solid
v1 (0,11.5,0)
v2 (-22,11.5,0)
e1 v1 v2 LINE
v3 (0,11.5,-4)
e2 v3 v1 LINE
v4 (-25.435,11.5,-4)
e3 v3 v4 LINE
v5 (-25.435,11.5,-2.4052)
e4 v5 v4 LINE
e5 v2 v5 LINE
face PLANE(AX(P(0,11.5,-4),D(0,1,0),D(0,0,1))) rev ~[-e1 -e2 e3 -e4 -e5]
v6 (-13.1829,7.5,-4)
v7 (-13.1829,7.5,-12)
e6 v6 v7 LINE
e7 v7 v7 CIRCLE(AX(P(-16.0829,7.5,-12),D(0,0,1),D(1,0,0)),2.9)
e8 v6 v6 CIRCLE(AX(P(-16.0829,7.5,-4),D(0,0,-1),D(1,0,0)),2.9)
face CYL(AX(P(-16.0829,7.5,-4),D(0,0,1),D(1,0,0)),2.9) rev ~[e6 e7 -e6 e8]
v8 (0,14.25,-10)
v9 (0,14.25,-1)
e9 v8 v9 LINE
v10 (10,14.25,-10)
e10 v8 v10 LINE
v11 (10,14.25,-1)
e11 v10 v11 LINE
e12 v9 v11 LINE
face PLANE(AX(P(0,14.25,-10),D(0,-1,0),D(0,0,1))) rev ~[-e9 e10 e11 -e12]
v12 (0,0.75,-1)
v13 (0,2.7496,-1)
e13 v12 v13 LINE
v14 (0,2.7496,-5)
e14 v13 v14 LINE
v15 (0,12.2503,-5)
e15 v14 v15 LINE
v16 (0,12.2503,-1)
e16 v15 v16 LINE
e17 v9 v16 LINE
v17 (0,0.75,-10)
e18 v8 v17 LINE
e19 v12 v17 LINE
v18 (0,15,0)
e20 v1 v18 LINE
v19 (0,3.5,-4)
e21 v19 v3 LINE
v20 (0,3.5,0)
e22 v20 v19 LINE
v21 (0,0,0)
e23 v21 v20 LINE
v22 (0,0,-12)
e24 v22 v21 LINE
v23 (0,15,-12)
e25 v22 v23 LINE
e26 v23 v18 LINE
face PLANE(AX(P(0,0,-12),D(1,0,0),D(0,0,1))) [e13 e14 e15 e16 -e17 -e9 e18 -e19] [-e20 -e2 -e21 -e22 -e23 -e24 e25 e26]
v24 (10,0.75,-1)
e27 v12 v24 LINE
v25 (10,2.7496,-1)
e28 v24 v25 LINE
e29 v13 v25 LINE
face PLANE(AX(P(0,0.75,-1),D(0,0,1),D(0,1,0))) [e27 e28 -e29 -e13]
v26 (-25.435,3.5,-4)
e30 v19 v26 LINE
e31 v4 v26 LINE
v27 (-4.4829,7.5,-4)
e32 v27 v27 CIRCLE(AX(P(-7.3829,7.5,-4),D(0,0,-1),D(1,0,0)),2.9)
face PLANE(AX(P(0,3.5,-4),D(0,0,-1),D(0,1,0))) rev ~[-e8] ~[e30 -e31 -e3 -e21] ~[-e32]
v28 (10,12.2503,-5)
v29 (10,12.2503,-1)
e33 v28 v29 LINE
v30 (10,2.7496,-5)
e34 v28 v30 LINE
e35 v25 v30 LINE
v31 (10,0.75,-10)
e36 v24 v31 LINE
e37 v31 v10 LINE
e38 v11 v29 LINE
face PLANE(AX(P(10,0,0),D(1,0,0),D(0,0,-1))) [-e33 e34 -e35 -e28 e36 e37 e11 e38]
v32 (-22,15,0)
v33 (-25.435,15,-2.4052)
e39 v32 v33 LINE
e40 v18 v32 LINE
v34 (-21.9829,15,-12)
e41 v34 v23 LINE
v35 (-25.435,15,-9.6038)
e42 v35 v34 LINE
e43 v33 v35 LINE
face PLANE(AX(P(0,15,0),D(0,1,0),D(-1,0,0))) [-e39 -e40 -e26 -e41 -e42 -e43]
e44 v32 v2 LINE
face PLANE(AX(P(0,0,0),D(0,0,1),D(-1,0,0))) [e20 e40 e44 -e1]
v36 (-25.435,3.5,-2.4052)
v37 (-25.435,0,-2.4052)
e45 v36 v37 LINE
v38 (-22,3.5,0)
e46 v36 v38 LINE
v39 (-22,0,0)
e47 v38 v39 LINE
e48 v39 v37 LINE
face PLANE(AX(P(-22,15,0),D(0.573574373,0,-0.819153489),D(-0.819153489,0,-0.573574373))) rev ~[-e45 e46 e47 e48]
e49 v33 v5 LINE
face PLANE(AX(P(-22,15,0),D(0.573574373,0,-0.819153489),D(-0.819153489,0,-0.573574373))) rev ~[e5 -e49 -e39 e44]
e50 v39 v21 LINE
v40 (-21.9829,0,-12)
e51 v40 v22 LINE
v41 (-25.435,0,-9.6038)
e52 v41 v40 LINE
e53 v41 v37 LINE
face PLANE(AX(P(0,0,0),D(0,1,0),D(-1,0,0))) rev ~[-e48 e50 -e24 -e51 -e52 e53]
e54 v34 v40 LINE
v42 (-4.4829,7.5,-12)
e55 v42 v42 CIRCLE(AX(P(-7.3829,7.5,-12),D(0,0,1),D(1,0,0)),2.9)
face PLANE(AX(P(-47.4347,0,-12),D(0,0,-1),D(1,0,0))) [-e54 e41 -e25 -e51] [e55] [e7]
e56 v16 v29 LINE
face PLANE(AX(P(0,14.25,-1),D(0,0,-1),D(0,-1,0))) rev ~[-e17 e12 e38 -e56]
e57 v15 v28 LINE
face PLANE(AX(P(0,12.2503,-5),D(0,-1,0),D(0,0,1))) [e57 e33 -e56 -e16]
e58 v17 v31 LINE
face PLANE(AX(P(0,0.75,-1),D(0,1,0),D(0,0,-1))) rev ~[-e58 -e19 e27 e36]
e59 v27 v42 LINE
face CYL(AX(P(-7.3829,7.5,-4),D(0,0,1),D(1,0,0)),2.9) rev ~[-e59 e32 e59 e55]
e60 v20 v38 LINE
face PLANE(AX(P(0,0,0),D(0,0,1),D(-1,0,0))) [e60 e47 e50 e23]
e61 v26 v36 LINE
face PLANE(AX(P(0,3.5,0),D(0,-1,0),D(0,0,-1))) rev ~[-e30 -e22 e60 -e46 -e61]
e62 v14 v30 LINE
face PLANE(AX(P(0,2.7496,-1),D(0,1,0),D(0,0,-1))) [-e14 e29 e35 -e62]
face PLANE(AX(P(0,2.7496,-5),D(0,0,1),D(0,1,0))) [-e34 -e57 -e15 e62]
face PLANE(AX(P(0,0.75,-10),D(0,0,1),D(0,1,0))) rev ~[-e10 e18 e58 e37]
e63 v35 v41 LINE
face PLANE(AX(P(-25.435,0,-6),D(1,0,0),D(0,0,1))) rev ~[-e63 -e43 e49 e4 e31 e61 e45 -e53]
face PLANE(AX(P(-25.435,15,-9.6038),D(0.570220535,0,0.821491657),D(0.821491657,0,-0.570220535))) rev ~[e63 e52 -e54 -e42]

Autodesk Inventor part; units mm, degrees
ref_plane "YZ Plane" through (0, 0, 0) normal (1, 0, 0) x (0, 1, 0)
ref_plane "XZ Plane" through (0, 0, 0) normal (0, 1, 0) x (-1, 0, 0)
ref_plane "XY Plane" through (0, 0, 0) normal (0, 0, 1) x (1, 0, 0)
sketch "Náčrt1" plane through (0, 0, 0) normal (0, 1, 0) x (-1, 0, 0)
  line L0 (0, 0) -> (50, 0)
  line L1 (50, 0) -> (66.0697, -19.1511)
  line L2 (50, 0) -> (75, 0) construction
  line L3 (66.0697, -19.1511) -> (58.4092, -25.579)
  line L4 (0, -12) -> (0, 0)
  line L5 (58.6554, -25.3724) -> (47.4347, -12)
  line L6 (47.4347, -12) -> (0, -12)
  dimension "d0" = 50
  dimension "d2" = 25
  dimension "d3" = 50
  dimension "d4" = 10
  dimension "d5" = 12
extrude "Vysunutí1" add sketch "Náčrt1" along normal blind 15
sketch "Náčrt11" plane through (0, 0, 0) normal (1, 0, 0) x (0, 0, -1)
  line L0 (0, 0) -> (0, 15) projected
  line L1 (0, 7.5) -> (12, 7.5)
  line L2 (12, 0) -> (12, 15) projected
  line L3 (0, 3.5) -> (4, 3.5)
  line L4 (4, 3.5) -> (4, 11.5)
  line L5 (4, 11.5) -> (0, 11.5)
  line L6 (0, 11.5) -> (0, 3.5)
  point P0 (0, 7.5)
  point P1 (0, 11.5)
  dimension "d64" = 4
  dimension "d65" = 8
extrude "Vysunutí10" cut sketch "Náčrt11" against normal through all
sketch "Náčrt21" plane through (-66.0697, 0, -19.1511) normal (-0.6427876, 0, -0.7660444) x (-0.7660444, 0, 0.6427876)
  line L0 (0, 0) -> (0, 15) projected
  line L1 (0, 3.5) -> (-4, 3.5)
  line L2 (-4, 3.5) -> (-4, 11.5)
  line L3 (-4, 11.5) -> (0, 11.5)
  line L4 (0, 11.5) -> (0, 3.5)
  point P0 (-38.3022, 0)
  point P1 (0, 7.5)
  point P2 (0, 11.5)
  dimension "d68" = 4
  dimension "d69" = 8
extrude "Vysunutí11" cut sketch "Náčrt21" against normal through all
sketch "Náčrt30" plane through (0, 0, -12) normal (0, 0, -1) x (-1, 0, 0)
  point P0 (0, 0)
sketch "Náčrt31" plane through (0, 0, 0) normal (1, 0, 0) x (0, 0, -1)
  point P0 (0, 0)
sketch "Náčrt32" plane through (0, 0, 0) normal (0, -1, 0) x (1, 0, 0)
  line L0 (-47.4347, -12) -> (-58.6554, -25.3724) projected
  line L1 (-47.4347, -12) -> (-47.4347, 0)
  line L2 (-47.4347, -12) -> (-58.6554, -25.3724)
  line L3 (-58.6554, -25.3724) -> (-66.0697, -19.1511) projected
  line L4 (-66.0697, -19.1511) -> (-50, 0)
  line L5 (-50, 0) -> (-47.4347, 0)
  line L6 (-50, 0) -> (0, 0) projected
  point P0 (-47.4347, 0)
extrude "Vysunutí16" add sketch "Náčrt32" against normal through all
sketch "Náčrt33" plane through (0, 0, 0) normal (0, -1, 0) x (1, 0, 0)
  line L0 (-47.4347, -12) -> (-58.6554, -25.3724) projected
  line L1 (-47.4347, -4) -> (-47.4347, 0) projected
  line L2 (-47.4347, -12) -> (-47.4347, 0)
  line L3 (-66.0697, -19.1511) -> (-50, 0) projected
  line L4 (-47.4347, 0) -> (-50, 0)
  line L5 (-50, 0) -> (-66.0697, -19.1511)
  line L6 (-50, 0) -> (0, 0) projected
  line L7 (-66.0697, -19.1511) -> (-50, 0) projected
  line L8 (-58.6554, -25.3724) -> (-66.0697, -19.1511) projected
  line L9 (-47.4347, -12) -> (-58.6554, -25.3724) projected
  line L10 (0, -12) -> (-47.4347, -12) projected
  line L11 (0, 0) -> (0, -12) projected
  line L12 (-58.6554, -25.3724) -> (-66.0697, -19.1511) projected
  line L13 (-66.0697, -19.1511) -> (-58.6554, -25.3724)
  line L14 (-58.6554, -25.3724) -> (-47.4347, -12)
extrude "Vysunutí17" cut sketch "Náčrt33" against normal through all contours L0 L8 L3 L4 L1 L2
sketch "Náčrt34" plane through (0, 0, 0) normal (0, -1, 0) x (1, 0, 0)
  line L0 (-47.4347, 0) -> (-47.4347, -12) projected
  line L1 (-47.4347, 0) -> (-47.4347, -12) projected
  line L2 (0, -12) -> (-47.4347, -12) projected
  line L3 (0, 0) -> (0, -12) projected
  line L4 (-47.4347, 0) -> (0, 0) projected
  line L5 (0, -12) -> (-47.4347, -12) projected
  line L6 (-44, -12) -> (-47.4347, -9.595)
  line L7 (-44, -12) -> (-39.807, -12) construction
  line L8 (-47.4347, -9.595) -> (-47.4347, -12)
  line L9 (-44, -12) -> (-47.4347, -12)
  line L10 (0, 0) -> (-47.4347, 0) projected
  line L11 (-44, 0) -> (-47.0563, -2.14)
  line L12 (-44, 0) -> (-40.269, 0) construction
  line L13 (-47.0563, -2.14) -> (-47.4347, -2.405)
  line L14 (-47.4347, -2.405) -> (-47.4347, 0)
  line L15 (-44, 0) -> (-47.4347, 0)
  dimension "d99" = 145
  dimension "d100" = 145
extrude "Vysunutí18" cut sketch "Náčrt34" against normal through all contours L4 L11 L13 L0 | L6 L2 L0
sketch "Náčrt39" plane through (0, 0, 0) normal (1, 0, 0) x (0, 0, -1)
  line L0 (0, 11.5) -> (0, 15) projected
  line L1 (12, 0) -> (12, 15) projected
  line L2 (0, 0) -> (0, 3.5) projected
  line L3 (1, 0.75) -> (10, 0.75)
  line L4 (10, 14.25) -> (1, 14.25)
  line L5 (1, 14.25) -> (1, 12.2503)
  line L6 (4, 4.7) -> (4, 10.3) projected
  line L7 (5, 12.2503) -> (1, 12.2503)
  line L8 (1, 0.75) -> (1, 2.7496)
  line L9 (1, 2.7496) -> (5, 2.7496)
  line L10 (5, 2.7496) -> (5, 12.2503)
  line L11 (10, 0.75) -> (10, 14.25)
  line L12 (4, 7.5) -> (12, 7.5)
  line L13 (12, 9.95) -> (12, 5.05) projected
  point P0 (1, 1.7498)
  point P1 (5, 7.5)
  point P2 (1, 13.2502)
  point P3 (10, 7.5)
  point P4 (5.5, 0.75)
  dimension "d119" = 13.5
extrude "Vysunutí22" add sketch "Náčrt39" along normal blind 10
sketch "Náčrt40" plane through (0, 0, 0) normal (0, -1, 0) x (1, 0, 0)
  line L0 (-47.4347, -2.405) -> (-47.4347, -9.595) projected
  line L1 (-47.4347, -6) -> (0, -6)
  line L2 (-44, 0) -> (-47.4347, -2.405) projected
  line L3 (-47.4347, -2.405) -> (-47.4347, -9.595) projected
  line L4 (-47.4347, -9.595) -> (-44, -12) projected
  line L5 (0, -12) -> (-44, -12) projected
  line L6 (0, 0) -> (0, -12) projected
  line L7 (-44, 0) -> (0, 0) projected
  line L8 (-27.885, -6) -> (-22.985, -6) projected
  line L9 (-25.435, -6) -> (-25.435, 0)
  line L10 (-25.435, -6) -> (-25.435, -12)
  dimension "d124" = 47.4347
extrude "Vysunutí24" cut sketch "Náčrt40" against normal through all contours L2 L7 L9 L1 L0 | L1 L10 L5 L4 L0
sketch "Náčrt41" plane through (0, 15, 0) normal (0, 1, 0) x (1, 0, 0)
  line L0 (-25.435, 0) -> (0, 0) projected
  line L1 (-25.435, 0) -> (-22, 0)
  line L2 (-22, 0) -> (-25.435, 2.4052)
  line L3 (-25.435, 12) -> (-25.435, 0) projected
  line L4 (-25.435, 2.4052) -> (-25.435, 0)
  line L5 (-22, 0) -> (-25.435, 0)
  line L6 (0, 12) -> (-25.435, 12) projected
  line L7 (-22, 12) -> (-17.9846, 12) construction
  line L8 (-25.435, 9.6038) -> (-21.9829, 12)
  line L9 (-25.435, 9.6038) -> (-25.435, 12)
  line L10 (-21.9829, 12) -> (-25.435, 12)
  dimension "d127" = 3.435
  dimension "d128" = 35
extrude "Vysunutí25" cut sketch "Náčrt41" against normal through all
sketch "Náčrt42" plane through (0, 3.5, -4) normal (0, 0, 1) x (1, 0, 0)
  line L0 (-25.435, 8) -> (-25.435, 0) projected
  line L1 (-25.435, 4) -> (0, 4)
  line L2 (0, -3.5) -> (0, 11.5) projected
  line L3 (-21.9829, -3.5) -> (-21.9829, 11.5) projected
  line L4 (-21.9829, 4) -> (-16.0829, 4)
  circle A0 centre (-16.0829, 4) radius 2.9
  line L5 (-13.1829, 4) -> (-10.1829, 4)
  circle A1 centre (-7.3829, 4) radius 2.9
  line L6 (-10.2829, 7.4092) -> (-10.2829, 0.965)
  dimension "d133" = 5.8
  dimension "d132" = 5.9
  dimension "d134" = 3
  dimension "d136" = 5.8
extrude "Vysunutí26" cut sketch "Náčrt42" against normal through all
properties part number "chodecsemafor"
